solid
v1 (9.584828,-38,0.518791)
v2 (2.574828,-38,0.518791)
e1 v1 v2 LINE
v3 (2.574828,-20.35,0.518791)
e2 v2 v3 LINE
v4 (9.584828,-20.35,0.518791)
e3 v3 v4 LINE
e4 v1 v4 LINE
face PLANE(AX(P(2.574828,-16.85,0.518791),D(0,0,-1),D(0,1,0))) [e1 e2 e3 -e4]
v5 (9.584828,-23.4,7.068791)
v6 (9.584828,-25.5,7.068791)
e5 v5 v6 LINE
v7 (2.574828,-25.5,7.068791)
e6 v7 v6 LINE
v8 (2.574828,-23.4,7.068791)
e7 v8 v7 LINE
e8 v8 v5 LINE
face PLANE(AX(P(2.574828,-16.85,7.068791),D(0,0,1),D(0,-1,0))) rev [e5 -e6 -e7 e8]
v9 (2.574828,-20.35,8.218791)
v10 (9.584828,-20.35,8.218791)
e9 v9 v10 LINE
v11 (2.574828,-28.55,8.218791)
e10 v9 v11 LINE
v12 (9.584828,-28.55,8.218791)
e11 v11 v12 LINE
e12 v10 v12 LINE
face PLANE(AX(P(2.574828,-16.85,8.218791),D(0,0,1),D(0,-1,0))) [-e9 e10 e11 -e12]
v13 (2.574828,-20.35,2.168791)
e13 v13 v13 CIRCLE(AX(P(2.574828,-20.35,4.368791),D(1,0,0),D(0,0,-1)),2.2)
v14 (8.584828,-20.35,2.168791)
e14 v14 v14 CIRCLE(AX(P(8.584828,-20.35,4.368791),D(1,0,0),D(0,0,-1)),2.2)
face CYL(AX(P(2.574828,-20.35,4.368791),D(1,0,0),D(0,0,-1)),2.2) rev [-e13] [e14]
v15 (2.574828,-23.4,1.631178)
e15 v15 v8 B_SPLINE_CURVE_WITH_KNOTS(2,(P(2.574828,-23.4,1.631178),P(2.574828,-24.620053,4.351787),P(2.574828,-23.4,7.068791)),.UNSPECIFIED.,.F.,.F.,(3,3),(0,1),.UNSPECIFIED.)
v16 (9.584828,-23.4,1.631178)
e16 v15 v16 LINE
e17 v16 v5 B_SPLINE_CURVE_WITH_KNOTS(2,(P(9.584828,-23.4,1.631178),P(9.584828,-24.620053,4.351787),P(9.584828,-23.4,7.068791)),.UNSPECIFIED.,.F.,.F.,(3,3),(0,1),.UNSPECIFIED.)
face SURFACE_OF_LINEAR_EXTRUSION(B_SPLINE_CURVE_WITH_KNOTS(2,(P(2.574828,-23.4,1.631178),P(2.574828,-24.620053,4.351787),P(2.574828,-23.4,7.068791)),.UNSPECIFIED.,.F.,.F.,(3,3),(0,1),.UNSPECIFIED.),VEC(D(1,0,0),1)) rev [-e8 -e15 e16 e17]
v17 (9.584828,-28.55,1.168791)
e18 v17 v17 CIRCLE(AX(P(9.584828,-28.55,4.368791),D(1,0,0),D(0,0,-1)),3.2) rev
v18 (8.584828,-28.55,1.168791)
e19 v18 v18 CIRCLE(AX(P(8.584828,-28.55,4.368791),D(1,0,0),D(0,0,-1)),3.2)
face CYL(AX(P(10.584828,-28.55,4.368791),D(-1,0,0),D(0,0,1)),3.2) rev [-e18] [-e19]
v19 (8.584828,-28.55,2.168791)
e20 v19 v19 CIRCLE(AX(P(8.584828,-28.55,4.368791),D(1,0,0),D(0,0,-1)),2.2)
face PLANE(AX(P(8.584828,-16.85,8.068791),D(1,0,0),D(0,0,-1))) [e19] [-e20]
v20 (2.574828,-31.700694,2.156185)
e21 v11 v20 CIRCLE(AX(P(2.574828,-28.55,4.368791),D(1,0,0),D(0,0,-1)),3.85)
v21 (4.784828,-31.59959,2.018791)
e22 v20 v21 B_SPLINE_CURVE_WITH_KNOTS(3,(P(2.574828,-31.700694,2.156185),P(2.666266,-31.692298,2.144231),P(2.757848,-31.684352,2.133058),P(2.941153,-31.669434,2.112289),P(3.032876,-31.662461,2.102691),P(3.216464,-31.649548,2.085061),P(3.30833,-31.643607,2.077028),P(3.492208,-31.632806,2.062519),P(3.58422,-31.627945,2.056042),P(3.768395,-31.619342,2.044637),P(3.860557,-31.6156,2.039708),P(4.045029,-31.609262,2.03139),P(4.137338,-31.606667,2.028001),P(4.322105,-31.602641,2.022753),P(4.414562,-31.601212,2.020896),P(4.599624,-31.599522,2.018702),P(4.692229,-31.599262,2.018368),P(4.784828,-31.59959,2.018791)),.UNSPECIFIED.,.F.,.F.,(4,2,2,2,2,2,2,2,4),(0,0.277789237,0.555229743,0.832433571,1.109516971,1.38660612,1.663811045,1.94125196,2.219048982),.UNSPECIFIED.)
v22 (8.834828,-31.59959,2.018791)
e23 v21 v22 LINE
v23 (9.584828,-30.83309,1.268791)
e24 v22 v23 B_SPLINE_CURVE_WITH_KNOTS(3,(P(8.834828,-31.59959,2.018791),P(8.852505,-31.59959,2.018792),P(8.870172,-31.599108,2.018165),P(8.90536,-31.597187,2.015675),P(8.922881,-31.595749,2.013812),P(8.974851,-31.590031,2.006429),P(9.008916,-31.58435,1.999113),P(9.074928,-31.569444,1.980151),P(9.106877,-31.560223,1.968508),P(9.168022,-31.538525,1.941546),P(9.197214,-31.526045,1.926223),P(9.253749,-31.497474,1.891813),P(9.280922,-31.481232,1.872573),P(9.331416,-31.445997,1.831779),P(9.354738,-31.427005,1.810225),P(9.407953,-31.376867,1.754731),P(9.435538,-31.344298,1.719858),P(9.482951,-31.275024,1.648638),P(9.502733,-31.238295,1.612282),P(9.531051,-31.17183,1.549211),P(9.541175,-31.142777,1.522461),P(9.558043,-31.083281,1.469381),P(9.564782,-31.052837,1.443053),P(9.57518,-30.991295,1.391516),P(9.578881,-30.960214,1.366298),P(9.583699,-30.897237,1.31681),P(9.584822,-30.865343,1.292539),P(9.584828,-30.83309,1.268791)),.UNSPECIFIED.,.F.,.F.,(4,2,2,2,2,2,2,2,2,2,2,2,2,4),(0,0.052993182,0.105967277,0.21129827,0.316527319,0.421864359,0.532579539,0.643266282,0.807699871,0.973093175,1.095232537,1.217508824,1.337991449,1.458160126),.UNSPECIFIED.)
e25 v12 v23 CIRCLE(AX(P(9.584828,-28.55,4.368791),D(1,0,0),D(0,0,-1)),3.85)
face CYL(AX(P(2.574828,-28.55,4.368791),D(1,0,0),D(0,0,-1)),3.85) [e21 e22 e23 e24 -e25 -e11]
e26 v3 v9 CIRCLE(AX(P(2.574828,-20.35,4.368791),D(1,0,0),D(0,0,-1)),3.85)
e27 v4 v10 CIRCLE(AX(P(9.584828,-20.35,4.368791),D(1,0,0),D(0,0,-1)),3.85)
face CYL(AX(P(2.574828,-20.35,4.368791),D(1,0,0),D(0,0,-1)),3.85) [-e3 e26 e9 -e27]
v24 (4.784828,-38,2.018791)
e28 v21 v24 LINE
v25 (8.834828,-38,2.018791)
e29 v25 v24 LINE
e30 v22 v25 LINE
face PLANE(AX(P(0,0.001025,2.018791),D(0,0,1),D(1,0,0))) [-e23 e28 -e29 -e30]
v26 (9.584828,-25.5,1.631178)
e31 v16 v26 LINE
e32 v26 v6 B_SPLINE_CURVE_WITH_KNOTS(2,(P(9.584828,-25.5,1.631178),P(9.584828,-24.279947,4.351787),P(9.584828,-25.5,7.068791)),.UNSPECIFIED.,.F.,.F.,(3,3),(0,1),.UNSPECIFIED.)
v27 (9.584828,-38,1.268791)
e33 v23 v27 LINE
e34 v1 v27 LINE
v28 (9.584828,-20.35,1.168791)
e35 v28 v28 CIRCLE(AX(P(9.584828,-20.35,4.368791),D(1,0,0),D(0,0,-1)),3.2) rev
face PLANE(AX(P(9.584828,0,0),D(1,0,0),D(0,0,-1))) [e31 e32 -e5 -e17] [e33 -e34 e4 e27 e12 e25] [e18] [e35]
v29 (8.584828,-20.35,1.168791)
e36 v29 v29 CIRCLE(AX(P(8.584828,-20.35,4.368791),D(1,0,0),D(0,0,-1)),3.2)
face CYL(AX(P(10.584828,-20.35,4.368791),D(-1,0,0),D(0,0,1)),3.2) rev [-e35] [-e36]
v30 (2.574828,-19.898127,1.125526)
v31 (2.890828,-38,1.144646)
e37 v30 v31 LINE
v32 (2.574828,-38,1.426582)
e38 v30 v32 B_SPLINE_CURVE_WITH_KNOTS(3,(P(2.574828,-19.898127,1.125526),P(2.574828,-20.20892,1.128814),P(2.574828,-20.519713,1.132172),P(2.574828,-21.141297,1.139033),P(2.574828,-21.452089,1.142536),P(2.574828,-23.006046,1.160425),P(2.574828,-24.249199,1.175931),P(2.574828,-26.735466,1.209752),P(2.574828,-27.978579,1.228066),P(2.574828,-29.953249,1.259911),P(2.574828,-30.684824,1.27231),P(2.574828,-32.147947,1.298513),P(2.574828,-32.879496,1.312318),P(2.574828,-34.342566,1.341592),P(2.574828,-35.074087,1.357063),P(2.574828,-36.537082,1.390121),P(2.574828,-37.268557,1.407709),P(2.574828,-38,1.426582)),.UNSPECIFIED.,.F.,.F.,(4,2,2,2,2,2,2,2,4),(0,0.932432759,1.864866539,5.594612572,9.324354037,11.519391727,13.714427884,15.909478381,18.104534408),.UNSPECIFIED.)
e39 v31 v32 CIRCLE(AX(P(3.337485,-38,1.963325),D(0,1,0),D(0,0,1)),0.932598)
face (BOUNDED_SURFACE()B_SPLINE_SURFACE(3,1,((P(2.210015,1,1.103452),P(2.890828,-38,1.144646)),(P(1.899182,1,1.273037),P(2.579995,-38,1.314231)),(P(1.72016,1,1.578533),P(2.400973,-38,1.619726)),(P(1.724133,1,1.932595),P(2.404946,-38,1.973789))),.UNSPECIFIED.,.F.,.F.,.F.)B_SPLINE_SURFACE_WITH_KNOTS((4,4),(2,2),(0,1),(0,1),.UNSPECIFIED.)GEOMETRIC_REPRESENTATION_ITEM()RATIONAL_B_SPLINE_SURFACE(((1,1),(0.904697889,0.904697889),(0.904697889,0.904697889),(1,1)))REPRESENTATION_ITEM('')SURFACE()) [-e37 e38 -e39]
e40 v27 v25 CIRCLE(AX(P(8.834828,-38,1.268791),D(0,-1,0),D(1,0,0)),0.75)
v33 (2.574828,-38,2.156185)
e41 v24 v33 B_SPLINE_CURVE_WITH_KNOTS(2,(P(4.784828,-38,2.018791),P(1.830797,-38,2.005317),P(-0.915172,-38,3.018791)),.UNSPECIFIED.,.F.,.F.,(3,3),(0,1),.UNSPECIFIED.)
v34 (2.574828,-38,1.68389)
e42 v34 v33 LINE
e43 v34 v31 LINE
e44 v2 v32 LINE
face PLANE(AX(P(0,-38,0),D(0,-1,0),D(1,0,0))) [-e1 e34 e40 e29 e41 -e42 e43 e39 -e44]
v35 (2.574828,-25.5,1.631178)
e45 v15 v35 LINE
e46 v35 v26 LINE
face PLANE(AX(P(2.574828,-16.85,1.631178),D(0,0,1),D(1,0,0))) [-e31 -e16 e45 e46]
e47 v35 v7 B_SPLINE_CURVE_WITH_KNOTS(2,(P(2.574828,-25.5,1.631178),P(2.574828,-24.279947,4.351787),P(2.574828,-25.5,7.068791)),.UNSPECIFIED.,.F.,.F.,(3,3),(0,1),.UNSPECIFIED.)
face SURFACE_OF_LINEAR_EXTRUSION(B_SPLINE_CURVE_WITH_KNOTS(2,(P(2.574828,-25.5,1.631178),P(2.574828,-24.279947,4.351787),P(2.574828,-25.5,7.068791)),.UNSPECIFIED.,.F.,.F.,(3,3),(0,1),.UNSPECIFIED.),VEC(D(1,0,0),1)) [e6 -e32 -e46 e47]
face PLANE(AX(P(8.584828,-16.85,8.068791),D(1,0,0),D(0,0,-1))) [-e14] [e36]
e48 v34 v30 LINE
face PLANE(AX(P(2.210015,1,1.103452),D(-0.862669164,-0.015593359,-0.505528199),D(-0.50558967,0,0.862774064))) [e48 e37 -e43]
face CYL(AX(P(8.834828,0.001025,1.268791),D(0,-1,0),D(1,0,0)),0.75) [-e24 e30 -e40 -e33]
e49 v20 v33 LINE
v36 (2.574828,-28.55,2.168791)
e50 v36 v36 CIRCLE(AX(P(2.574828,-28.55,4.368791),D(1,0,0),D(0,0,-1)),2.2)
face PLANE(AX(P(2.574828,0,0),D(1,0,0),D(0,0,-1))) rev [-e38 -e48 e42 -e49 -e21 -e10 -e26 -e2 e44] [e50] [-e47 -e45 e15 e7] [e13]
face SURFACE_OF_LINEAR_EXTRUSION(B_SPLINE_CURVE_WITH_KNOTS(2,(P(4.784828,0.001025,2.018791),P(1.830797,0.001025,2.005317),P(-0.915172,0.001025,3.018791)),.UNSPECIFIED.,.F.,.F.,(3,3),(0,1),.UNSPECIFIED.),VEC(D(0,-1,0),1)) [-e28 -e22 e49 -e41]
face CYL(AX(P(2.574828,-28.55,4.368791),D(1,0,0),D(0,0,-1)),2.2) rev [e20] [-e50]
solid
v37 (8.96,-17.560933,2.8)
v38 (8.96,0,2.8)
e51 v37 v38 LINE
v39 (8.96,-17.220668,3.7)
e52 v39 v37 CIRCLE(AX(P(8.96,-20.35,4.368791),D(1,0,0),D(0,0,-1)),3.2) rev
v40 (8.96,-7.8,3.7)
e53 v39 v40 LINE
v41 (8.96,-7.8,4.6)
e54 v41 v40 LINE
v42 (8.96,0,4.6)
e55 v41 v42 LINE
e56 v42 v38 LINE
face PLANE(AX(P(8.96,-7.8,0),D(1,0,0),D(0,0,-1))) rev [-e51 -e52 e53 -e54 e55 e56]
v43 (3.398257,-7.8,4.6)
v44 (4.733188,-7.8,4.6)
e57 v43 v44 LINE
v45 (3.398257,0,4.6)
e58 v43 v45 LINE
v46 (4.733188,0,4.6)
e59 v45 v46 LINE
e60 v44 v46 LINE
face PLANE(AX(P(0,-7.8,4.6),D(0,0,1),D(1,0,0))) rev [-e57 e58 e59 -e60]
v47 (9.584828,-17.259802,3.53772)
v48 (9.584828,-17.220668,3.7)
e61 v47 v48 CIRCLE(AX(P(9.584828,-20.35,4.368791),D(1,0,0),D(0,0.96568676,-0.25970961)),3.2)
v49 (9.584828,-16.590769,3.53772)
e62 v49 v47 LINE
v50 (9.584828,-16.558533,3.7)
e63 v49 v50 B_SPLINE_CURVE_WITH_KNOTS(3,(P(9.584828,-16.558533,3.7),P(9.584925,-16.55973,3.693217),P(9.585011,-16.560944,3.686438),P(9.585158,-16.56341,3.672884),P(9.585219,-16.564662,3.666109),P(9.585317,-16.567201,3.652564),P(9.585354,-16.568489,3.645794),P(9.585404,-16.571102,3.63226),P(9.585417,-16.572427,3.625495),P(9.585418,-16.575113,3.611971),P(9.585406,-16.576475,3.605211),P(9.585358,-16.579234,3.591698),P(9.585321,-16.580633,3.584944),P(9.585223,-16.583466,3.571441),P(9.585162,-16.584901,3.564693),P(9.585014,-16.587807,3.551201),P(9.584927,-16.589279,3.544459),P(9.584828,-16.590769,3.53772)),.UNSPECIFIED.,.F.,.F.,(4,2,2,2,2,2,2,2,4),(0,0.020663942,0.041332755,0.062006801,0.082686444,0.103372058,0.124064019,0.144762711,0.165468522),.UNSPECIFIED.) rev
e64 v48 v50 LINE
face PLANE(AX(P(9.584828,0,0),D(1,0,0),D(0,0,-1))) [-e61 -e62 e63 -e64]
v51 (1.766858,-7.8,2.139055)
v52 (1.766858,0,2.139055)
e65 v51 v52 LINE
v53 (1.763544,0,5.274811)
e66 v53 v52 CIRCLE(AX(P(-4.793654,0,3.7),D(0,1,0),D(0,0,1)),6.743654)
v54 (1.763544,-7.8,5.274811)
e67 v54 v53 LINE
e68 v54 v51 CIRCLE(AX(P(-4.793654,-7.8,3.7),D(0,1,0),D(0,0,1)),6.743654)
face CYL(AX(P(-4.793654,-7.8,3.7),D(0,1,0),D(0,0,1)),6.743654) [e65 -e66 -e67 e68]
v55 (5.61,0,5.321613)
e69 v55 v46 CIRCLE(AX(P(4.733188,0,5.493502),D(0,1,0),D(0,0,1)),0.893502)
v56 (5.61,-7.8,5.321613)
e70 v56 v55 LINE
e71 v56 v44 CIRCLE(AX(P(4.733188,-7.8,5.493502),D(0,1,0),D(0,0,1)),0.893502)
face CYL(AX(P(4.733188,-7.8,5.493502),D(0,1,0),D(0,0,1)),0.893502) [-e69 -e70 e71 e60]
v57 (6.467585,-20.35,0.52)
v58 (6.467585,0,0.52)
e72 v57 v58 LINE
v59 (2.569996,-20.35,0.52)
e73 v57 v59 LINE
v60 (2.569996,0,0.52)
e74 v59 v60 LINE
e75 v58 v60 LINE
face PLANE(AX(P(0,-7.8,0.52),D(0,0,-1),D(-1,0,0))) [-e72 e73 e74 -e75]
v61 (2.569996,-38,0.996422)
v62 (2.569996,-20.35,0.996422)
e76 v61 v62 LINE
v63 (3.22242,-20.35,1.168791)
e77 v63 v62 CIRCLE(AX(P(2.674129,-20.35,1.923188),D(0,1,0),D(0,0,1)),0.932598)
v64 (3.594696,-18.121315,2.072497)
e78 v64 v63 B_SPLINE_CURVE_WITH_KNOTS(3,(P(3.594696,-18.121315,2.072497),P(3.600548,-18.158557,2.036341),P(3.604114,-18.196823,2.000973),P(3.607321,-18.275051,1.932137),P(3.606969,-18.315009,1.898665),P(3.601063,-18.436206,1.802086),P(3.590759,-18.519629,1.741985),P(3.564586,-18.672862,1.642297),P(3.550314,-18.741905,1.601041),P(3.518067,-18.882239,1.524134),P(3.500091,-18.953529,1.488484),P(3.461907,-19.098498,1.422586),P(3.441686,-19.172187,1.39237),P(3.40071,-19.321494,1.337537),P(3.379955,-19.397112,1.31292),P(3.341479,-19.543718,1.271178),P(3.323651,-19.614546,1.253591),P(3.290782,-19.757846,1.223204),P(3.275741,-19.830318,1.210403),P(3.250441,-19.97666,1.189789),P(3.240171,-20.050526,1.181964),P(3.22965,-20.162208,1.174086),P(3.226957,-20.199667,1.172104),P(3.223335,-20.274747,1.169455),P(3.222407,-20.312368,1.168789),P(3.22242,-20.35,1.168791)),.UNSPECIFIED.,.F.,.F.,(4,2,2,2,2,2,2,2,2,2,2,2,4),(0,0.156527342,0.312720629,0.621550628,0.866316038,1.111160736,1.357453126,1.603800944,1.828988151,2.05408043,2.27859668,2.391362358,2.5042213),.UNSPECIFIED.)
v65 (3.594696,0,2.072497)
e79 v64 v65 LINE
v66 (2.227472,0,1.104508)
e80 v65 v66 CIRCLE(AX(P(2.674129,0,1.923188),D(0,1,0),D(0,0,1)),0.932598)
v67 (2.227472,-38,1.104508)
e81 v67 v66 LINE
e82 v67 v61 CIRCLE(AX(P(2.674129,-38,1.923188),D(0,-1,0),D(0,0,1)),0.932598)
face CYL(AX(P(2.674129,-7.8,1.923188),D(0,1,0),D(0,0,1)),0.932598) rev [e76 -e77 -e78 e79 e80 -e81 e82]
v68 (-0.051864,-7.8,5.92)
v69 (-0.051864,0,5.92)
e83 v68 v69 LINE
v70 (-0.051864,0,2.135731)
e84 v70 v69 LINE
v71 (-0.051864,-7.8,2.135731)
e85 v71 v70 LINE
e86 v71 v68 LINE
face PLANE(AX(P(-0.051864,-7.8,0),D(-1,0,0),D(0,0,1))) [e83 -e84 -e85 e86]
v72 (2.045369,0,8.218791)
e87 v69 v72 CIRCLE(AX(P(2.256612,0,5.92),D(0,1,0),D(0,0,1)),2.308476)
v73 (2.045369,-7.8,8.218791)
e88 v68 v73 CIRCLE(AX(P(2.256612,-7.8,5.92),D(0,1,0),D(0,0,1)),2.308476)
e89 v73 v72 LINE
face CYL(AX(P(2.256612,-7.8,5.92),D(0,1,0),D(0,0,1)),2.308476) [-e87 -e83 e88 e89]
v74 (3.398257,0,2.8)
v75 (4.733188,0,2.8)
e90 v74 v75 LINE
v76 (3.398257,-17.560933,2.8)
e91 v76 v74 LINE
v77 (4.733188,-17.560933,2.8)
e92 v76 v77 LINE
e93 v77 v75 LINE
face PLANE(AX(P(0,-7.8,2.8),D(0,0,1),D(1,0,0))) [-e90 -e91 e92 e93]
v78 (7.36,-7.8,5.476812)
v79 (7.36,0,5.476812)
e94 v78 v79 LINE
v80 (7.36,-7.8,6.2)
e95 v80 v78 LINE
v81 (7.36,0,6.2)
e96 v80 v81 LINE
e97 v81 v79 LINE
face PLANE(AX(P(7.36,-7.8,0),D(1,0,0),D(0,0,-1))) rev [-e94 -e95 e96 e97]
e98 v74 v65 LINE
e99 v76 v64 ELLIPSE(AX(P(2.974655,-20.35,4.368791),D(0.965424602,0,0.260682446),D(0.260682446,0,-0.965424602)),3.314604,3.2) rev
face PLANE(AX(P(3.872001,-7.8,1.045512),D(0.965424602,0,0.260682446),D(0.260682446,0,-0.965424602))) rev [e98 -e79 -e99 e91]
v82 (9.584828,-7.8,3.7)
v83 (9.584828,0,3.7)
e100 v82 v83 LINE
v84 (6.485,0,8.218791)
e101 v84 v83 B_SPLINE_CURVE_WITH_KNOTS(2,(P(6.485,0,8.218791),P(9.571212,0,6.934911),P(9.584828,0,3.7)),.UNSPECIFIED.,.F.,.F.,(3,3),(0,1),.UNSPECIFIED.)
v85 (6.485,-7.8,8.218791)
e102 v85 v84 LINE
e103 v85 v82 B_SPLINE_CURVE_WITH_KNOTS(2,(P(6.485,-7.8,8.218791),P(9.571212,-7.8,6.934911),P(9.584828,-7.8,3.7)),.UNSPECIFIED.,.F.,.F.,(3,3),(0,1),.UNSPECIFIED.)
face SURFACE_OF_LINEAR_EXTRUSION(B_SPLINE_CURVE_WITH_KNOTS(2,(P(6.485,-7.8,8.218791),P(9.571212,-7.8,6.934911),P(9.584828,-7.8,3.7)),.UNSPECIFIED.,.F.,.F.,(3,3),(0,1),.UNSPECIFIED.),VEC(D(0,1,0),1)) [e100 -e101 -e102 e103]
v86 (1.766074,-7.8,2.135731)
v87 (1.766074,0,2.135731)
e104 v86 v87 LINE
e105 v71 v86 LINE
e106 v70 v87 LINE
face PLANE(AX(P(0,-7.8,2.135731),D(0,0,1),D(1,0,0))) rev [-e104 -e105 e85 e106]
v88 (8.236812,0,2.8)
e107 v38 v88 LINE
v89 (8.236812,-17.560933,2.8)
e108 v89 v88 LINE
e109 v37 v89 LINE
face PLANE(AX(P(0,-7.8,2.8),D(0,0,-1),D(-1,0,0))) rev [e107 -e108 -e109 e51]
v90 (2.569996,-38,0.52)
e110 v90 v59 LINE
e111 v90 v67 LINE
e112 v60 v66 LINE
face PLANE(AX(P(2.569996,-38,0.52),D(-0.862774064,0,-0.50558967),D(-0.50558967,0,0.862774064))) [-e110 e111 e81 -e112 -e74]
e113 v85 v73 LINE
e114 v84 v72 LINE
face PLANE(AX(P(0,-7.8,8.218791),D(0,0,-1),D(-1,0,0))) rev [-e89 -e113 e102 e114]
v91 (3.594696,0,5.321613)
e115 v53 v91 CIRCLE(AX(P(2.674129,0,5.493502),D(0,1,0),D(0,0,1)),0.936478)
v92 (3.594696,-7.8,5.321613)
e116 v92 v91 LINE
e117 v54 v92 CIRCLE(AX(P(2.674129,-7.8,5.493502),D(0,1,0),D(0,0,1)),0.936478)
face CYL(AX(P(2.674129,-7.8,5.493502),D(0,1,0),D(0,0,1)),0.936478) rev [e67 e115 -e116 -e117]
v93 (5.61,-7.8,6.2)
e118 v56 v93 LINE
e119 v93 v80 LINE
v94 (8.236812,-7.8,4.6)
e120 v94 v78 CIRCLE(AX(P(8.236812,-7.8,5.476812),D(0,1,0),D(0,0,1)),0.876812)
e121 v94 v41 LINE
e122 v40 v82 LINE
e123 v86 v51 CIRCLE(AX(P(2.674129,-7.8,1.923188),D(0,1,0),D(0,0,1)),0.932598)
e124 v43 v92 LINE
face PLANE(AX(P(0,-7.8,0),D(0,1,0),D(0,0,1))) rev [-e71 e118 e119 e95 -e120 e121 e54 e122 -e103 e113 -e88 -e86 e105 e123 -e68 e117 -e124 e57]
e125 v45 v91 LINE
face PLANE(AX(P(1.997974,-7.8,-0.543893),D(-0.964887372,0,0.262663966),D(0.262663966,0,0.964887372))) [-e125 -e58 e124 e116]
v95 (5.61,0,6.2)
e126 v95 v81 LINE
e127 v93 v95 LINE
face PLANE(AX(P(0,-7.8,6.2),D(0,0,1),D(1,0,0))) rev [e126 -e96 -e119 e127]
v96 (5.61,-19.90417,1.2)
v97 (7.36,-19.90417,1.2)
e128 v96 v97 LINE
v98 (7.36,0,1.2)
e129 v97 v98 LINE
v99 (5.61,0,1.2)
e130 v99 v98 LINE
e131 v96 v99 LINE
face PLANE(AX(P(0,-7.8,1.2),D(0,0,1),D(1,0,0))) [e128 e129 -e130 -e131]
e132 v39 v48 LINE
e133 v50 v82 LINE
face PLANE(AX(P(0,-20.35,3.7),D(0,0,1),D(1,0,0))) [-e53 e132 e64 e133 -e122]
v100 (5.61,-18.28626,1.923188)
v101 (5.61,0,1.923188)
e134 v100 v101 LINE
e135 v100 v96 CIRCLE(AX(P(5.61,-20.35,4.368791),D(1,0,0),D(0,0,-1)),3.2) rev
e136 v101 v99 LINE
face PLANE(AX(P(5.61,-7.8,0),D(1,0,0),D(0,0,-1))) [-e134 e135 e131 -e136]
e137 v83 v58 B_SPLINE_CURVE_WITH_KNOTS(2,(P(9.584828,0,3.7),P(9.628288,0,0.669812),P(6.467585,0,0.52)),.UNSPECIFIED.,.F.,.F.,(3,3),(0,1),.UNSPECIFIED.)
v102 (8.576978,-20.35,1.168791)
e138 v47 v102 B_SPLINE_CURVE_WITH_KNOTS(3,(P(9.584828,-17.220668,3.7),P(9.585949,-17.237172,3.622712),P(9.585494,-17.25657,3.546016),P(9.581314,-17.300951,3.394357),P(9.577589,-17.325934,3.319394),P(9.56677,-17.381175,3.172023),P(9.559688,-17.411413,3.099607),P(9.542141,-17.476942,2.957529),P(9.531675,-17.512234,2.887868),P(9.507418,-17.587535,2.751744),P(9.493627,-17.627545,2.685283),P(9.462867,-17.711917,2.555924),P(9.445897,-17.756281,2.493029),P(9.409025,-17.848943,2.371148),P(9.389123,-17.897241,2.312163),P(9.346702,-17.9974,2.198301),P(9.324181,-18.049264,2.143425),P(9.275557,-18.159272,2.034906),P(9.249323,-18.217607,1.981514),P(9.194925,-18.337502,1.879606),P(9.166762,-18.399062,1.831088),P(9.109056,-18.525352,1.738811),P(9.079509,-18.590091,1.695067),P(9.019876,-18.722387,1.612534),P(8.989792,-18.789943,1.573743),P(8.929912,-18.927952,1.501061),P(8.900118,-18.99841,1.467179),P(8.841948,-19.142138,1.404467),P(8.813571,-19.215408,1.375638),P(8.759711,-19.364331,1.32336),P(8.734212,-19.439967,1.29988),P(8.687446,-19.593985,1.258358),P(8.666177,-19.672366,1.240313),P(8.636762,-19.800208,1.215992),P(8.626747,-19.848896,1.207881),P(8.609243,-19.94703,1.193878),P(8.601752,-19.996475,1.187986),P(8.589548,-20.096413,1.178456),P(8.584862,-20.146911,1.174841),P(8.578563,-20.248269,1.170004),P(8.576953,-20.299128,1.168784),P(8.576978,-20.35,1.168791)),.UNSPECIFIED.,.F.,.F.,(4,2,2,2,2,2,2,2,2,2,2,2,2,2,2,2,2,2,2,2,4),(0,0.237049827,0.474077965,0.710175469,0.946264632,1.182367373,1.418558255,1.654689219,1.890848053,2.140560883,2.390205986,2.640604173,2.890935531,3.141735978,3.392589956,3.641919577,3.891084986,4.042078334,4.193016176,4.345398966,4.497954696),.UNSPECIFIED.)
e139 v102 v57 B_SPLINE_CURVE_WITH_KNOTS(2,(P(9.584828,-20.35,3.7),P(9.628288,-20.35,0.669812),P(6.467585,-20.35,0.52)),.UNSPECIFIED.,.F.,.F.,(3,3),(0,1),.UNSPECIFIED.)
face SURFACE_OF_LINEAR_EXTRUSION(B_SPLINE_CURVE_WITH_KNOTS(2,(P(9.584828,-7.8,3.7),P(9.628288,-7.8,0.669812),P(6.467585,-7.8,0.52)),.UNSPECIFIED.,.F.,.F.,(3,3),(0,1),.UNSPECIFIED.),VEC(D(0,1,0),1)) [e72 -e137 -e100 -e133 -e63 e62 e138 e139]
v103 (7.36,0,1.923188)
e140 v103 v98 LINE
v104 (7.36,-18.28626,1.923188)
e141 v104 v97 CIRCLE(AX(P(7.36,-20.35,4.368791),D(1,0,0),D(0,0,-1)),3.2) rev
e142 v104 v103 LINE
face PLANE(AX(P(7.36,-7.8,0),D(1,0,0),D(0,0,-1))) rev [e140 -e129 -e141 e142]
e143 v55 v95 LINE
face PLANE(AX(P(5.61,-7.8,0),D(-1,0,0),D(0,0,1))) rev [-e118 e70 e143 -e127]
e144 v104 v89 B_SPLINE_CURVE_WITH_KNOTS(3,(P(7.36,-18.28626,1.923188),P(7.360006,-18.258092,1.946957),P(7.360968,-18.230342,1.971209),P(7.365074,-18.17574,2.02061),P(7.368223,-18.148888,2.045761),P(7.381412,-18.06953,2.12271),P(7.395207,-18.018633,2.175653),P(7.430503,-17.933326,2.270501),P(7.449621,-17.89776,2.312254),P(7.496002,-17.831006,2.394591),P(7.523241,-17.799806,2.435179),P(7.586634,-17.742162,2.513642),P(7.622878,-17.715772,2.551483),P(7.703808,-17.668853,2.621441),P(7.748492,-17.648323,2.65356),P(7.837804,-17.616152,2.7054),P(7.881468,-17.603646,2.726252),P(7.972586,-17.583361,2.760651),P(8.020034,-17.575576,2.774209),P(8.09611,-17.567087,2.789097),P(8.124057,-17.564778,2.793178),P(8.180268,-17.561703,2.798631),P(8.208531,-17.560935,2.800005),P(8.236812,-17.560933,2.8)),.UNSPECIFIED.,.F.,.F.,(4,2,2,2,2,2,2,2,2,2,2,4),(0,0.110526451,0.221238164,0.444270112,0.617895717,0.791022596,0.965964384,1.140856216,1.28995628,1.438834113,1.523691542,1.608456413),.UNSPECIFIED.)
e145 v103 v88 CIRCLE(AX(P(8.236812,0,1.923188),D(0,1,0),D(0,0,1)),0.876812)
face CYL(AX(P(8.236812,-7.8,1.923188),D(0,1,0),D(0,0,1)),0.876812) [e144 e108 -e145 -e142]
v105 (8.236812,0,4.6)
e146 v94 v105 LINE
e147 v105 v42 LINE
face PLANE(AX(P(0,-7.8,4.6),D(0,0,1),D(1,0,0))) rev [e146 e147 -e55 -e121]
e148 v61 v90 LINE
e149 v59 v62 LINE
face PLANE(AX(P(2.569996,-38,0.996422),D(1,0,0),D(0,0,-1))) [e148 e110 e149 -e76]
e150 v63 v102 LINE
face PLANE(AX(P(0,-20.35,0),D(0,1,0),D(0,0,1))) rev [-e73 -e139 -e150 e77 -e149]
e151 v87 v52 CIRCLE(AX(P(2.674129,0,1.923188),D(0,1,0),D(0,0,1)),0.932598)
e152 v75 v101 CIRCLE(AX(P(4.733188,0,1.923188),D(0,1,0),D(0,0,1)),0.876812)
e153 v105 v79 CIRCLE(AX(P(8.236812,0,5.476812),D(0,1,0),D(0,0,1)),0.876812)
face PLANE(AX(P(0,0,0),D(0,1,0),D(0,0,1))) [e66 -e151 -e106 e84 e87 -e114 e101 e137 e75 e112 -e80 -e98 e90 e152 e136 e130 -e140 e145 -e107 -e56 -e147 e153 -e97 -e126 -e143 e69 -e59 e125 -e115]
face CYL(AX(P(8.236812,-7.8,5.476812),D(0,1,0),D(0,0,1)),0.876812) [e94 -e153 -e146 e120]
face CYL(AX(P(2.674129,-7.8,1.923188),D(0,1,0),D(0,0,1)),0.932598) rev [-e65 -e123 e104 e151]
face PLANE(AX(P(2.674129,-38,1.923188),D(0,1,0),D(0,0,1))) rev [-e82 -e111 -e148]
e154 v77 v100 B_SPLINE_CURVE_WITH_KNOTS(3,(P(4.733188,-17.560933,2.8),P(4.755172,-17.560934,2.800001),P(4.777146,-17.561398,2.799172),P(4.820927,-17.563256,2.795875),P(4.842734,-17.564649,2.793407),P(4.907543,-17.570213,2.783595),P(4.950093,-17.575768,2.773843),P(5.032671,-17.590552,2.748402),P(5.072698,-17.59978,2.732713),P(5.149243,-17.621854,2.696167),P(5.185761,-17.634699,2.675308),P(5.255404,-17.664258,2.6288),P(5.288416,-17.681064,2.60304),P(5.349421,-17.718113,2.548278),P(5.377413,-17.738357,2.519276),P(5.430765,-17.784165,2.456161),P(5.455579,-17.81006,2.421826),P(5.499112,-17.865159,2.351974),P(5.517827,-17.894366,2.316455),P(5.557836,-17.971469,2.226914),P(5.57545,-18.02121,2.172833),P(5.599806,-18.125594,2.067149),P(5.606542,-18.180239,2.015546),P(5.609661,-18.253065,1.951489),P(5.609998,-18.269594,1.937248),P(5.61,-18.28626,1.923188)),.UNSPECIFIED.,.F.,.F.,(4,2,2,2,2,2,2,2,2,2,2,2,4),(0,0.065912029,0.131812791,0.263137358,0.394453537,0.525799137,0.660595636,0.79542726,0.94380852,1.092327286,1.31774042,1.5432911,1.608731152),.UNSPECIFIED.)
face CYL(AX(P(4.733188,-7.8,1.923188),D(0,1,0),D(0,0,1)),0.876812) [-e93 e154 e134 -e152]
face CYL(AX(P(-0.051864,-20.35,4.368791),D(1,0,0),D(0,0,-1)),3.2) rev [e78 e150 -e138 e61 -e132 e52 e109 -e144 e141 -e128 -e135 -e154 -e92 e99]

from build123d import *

# Parameters (mm, degrees)
SKETCH4_R                 = 3.2
BOSS_EXTRUDE1_DEPTH       = 7.01
SKETCH4_3_R               = 3.2
SKETCH4_3_R_2             = 2.2
BOSS_EXTRUDE2_DEPTH       = 7.01
SKETCH4_4_R               = 3.2
SKETCH4_4_R_2             = 2.2
BOSS_EXTRUDE3_DEPTH       = 7.01
CUT_EXTRUDE6_DEPTH        = 1
CUT_EXTRUDE6_DEPTH_BACK   = 1
SKETCH4_10_R              = 3.2
SKETCH4_10_R_2            = 2.2
CUT_EXTRUDE7_DEPTH        = 1
CUT_EXTRUDE7_DEPTH_BACK   = 1
SKETCH4_11_R              = 3.2
SKETCH4_11_R_2            = 2.2
BOSS_EXTRUDE7_DEPTH       = 7.8
BOSS_EXTRUDE10_DEPTH      = 20.35
CUT_EXTRUDE8_DEPTH        = 35.787560655
CUT_EXTRUDE8_DEPTH_BACK   = 35.787560655
SKETCH12_R                = 3.2
SKETCH12_R_2              = 2.2
CUT_EXTRUDE10_START       = 4
SKETCH12_4_R              = 3.2
CUT_EXTRUDE10_DEPTH       = 4
BOSS_EXTRUDE14_REACH      = 42.043
BOSS_EXTRUDE14_END_RADIUS = 3.85
BOSS_EXTRUDE15_DEPTH      = 38


with BuildPart() as part:
    # Sketch4 → Boss-Extrude1 (new body)
    with BuildSketch(Plane(origin=(9.58482821, 0, 0), x_dir=(0, 0, -1), z_dir=(1, 0, 0))):
        with BuildLine():
            ThreePointArc((-0.15, -11.7), (3.7, -15.55), (7.55, -11.7))
            Line((7.55, -11.7), (7.55, -3.5))
            ThreePointArc((7.55, -3.5), (3.7, 0.35), (-0.15, -3.5))
            Line((-0.15, -3.5), (-0.15, -11.7))
        make_face()
        with Locations((3.7, -11.7)):
            Circle(SKETCH4_R, mode=Mode.SUBTRACT)
        with BuildLine():
            Line((6.437612841, -6.55), (6.437612841, -7.6))
            Line((6.437612841, -7.6), (6.437612841, -8.125))
            Line((6.437612841, -8.125), (6.437612841, -8.65))
            add(Edge.make_bspline(
                [(6.437612841, -8.65), (3.717003621, -7.429947086), (1, -8.65)],
                knots=[0, 0, 0, 1, 1, 1], degree=2))
            Line((1, -8.65), (1, -7.6))
            Line((1, -7.6), (1, -6.55))
            add(Edge.make_bspline(
                [(6.437612841, -6.55), (3.717003621, -7.770052914), (1, -6.55)],
                knots=[0, 0, 0, 1, 1, 1], degree=2))
        make_face(mode=Mode.SUBTRACT)
        with Locations((3.7, -3.5)):
            Circle(SKETCH4_R, mode=Mode.SUBTRACT)
    extrude(amount=-BOSS_EXTRUDE1_DEPTH)

    # Sketch4<3> → Boss-Extrude2 (add)
    with BuildSketch(Plane(origin=(9.58482821, 0, 0), x_dir=(0, 0, -1), z_dir=(1, 0, 0))):
        with Locations((3.7, -3.5)):
            Circle(SKETCH4_3_R)
        with Locations((3.7, -3.5)):
            Circle(SKETCH4_3_R_2, mode=Mode.SUBTRACT)
    extrude(amount=-BOSS_EXTRUDE2_DEPTH)

    # Sketch4<4> → Boss-Extrude3 (add)
    with BuildSketch(Plane(origin=(9.58482821, 0, 0), x_dir=(0, 0, -1), z_dir=(1, 0, 0))):
        with Locations((3.7, -11.7)):
            Circle(SKETCH4_4_R)
        with Locations((3.7, -11.7)):
            Circle(SKETCH4_4_R_2, mode=Mode.SUBTRACT)
    extrude(amount=-BOSS_EXTRUDE3_DEPTH)

    # Sketch4<10> → Cut-Extrude6 (cut, two sides: drawn at the far end of the back side and taken through both)
    with BuildSketch(Plane(origin=(9.58482821, 0, 0), x_dir=(0, 0, -1), z_dir=(1, 0, 0)).offset(-CUT_EXTRUDE6_DEPTH_BACK)):
        with Locations((3.7, -11.7)):
            Circle(SKETCH4_10_R)
        with Locations((3.7, -11.7)):
            Circle(SKETCH4_10_R_2, mode=Mode.SUBTRACT)
    extrude(amount=CUT_EXTRUDE6_DEPTH + CUT_EXTRUDE6_DEPTH_BACK, mode=Mode.SUBTRACT)

    # Sketch4<11> → Cut-Extrude7 (cut, two sides: drawn at the far end of the back side and taken through both)
    with BuildSketch(Plane(origin=(9.58482821, 0, 0), x_dir=(0, 0, -1), z_dir=(1, 0, 0)).offset(-CUT_EXTRUDE7_DEPTH_BACK)):
        with Locations((3.7, -3.5)):
            Circle(SKETCH4_11_R)
        with Locations((3.7, -3.5)):
            Circle(SKETCH4_11_R_2, mode=Mode.SUBTRACT)
    extrude(amount=CUT_EXTRUDE7_DEPTH + CUT_EXTRUDE7_DEPTH_BACK, mode=Mode.SUBTRACT)


with BuildPart() as body_2:
    # Sketch1 → Boss-Extrude7 (new body)
    with BuildSketch(Plane(origin=(0, 0, 0), x_dir=(1, 0, 0), z_dir=(0, 1, 0))):
        with BuildLine():
            Line((3.59469637, -2.072497286), (3.398257221, -2.8))
            Line((3.398257221, -2.8), (4.733187591, -2.8))
            ThreePointArc((4.733187591, -2.8), (5.272835448, -2.614259361), (5.583849365, -2.13573064))
            ThreePointArc((5.583849365, -2.13573064), (5.603437785, -2.030260467), (5.61, -1.923187591))
            Line((5.61, -1.923187591), (5.61, -1.2))
            Line((5.61, -1.2), (7.36, -1.2))
            Line((7.36, -1.2), (7.36, -1.923187591))
            ThreePointArc((7.36, -1.923187591), (7.616812409, -2.543187591), (8.236812409, -2.8))
            Line((8.236812409, -2.8), (8.96, -2.8))
            Line((8.96, -2.8), (8.96, -4.6))
            Line((8.96, -4.6), (8.236812409, -4.6))
            ThreePointArc((8.236812409, -4.6), (7.616812409, -4.856812409), (7.36, -5.476812409))
            Line((7.36, -5.476812409), (7.36, -6.2))
            Line((7.36, -6.2), (5.61, -6.2))
            Line((5.61, -6.2), (5.61, -5.321612701))
            ThreePointArc((5.61, -5.321612701), (5.300973839, -4.8036001), (4.733187591, -4.6))
            Line((4.733187591, -4.6), (3.398257221, -4.6))
            Line((3.398257221, -4.6), (3.59469637, -5.321612701))
            ThreePointArc((3.59469637, -5.321612701), (2.650201437, -6.429674305), (1.763543504, -5.27481115))
            ThreePointArc((1.763543504, -5.27481115), (1.949996233, -3.707128316), (1.766858128, -2.139054809))
            ThreePointArc((1.766858128, -2.139054809), (1.76646436, -2.137393083), (1.766073636, -2.13573064))
            Line((1.766073636, -2.13573064), (-0.051864294, -2.13573064))
            Line((-0.051864294, -2.13573064), (-0.051864294, -5.92))
            ThreePointArc((-0.051864294, -5.92), (0.551221604, -7.47586198), (2.045368773, -8.21879087))
            Line((2.045368773, -8.21879087), (6.485, -8.21879087))
            add(Edge.make_bspline(
                [(6.485, -8.21879087), (9.5712117, -6.934911374), (9.58482821, -3.7)],
                knots=[0, 0, 0, 1, 1, 1], degree=2))
            add(Edge.make_bspline(
                [(9.58482821, -3.7), (9.628287772, -0.669812126), (6.467585098, -0.52)],
                knots=[0, 0, 0, 1, 1, 1], degree=2))
            Line((6.467585098, -0.52), (2.569996233, -0.52))
            Line((2.569996233, -0.52), (2.569996233, -0.9964218))
            ThreePointArc((2.569996233, -0.9964218), (3.349499839, -1.280060786), (3.59469637, -2.072497286))
        make_face()
    extrude(amount=-BOSS_EXTRUDE7_DEPTH)

    # Sketch1<9> → Boss-Extrude10 (add)
    with BuildSketch(Plane(origin=(0, 0, 0), x_dir=(1, 0, 0), z_dir=(0, 1, 0))):
        with BuildLine():
            Line((3.59469637, -2.072497286), (3.398257221, -2.8))
            Line((3.398257221, -2.8), (4.733187591, -2.8))
            ThreePointArc((4.733187591, -2.8), (5.272835448, -2.614259361), (5.583849365, -2.13573064))
            ThreePointArc((5.583849365, -2.13573064), (5.603437785, -2.030260467), (5.61, -1.923187591))
            Line((5.61, -1.923187591), (5.61, -1.2))
            Line((5.61, -1.2), (7.36, -1.2))
            Line((7.36, -1.2), (7.36, -1.923187591))
            ThreePointArc((7.36, -1.923187591), (7.616812409, -2.543187591), (8.236812409, -2.8))
            Line((8.236812409, -2.8), (8.96, -2.8))
            Line((8.96, -2.8), (8.96, -3.7))
            Line((8.96, -3.7), (9.58482821, -3.7))
            add(Edge.make_bspline(
                [(9.58482821, -3.7), (9.628287772, -0.669812126), (6.467585098, -0.52)],
                knots=[0, 0, 0, 1, 1, 1], degree=2))
            Line((6.467585098, -0.52), (2.569996233, -0.52))
            Line((2.569996233, -0.52), (2.569996233, -0.9964218))
            ThreePointArc((2.569996233, -0.9964218), (3.349499839, -1.280060786), (3.59469637, -2.072497286))
        make_face()
    extrude(amount=-BOSS_EXTRUDE10_DEPTH)

    # Sketch12 → Cut-Extrude8 (cut, two sides: drawn at the far end of the back side and taken through both)
    # profile 1 of 2: a face of its own
    with BuildSketch(Plane(origin=(9.58482821, 0, 0), x_dir=(0, 0, -1), z_dir=(1, 0, 0)).offset(-CUT_EXTRUDE8_DEPTH_BACK)):
        with Locations((-4.368790873, -20.349999996)):
            Circle(SKETCH12_R)
        with Locations((-4.368790873, -20.349999996)):
            Circle(SKETCH12_R_2, mode=Mode.SUBTRACT)
    # profile 2 of 2: a face of its own
    with BuildSketch(Plane(origin=(9.58482821, 0, 0), x_dir=(0, 0, -1), z_dir=(1, 0, 0)).offset(-CUT_EXTRUDE8_DEPTH_BACK)):
        with Locations((-4.368790873, -20.349999996)):
            Circle(SKETCH12_R)
    extrude(amount=CUT_EXTRUDE8_DEPTH + CUT_EXTRUDE8_DEPTH_BACK, mode=Mode.SUBTRACT)

    # Sketch12<4> → Cut-Extrude10 (cut)
    with BuildSketch(Plane(origin=(9.58482821, 0, 0), x_dir=(0, 0, -1), z_dir=(1, 0, 0)).offset(CUT_EXTRUDE10_START)):
        with BuildLine():
            ThreePointArc((-2.54662978, -23.741493613), (-1.064413458, -22.325750461), (-0.518790873, -20.349999996))
            ThreePointArc((-0.518790873, -20.349999996), (-4.368790873, -16.499999996), (-8.218790873, -20.349999996))
            ThreePointArc((-8.218790873, -20.349999996), (-7.686598281, -22.303113922), (-6.237152428, -23.716262776))
            add(Edge.make_bspline(
                [(-6.237152428, -23.716262776), (-4.392721558, -24.290891537), (-2.54662978, -23.741493613)],
                knots=[0.15302777, 0.15302777, 0.15302777, 0.831737351, 0.831737351, 0.831737351], degree=2))
        make_face()
        with Locations((-4.368790873, -20.349999996)):
            Circle(SKETCH12_4_R, mode=Mode.SUBTRACT)
    extrude(amount=-CUT_EXTRUDE10_DEPTH, mode=Mode.SUBTRACT)

    # Sketch20 → Boss-Extrude15 (add)
    with BuildSketch(Plane(origin=(0, 0, 0), x_dir=(1, 0, 0), z_dir=(0, 1, 0))):
        with BuildLine():
            Line((2.569996233, -0.9964218), (2.569996233, -0.52))
            Line((2.569996233, -0.52), (2.227471679, -1.104508185))
            ThreePointArc((2.227471679, -1.104508185), (2.393481354, -1.033819556), (2.569996233, -0.9964218))
        make_face()
    extrude(amount=-BOSS_EXTRUDE15_DEPTH)


with BuildPart() as part_1:
    # Move Face5: read off the stored shape, not the designer's step
    # Move Face5: moved
    add(part.part.moved(Location((0, -16.85, 8.0687909))))

    # Boss-Extrude14: up to this cylinder (the profile starts outside it)
    boss_extrude14_end = Plane(origin=(6.013975, -28.549999996, 4.368790873), z_dir=(1, 0, 0)) * Cylinder(BOSS_EXTRUDE14_END_RADIUS, 92.786, mode=Mode.PRIVATE)
    # Sketch2<17> → Boss-Extrude14 (add, up to the surface)
    with BuildSketch(Plane(origin=(0, -38, 0), x_dir=(-1, 0, 0), z_dir=(0, -1, 0)), mode=Mode.PRIVATE) as boss_extrude14_sk1:
        with BuildLine():
            Line((-2.57482821, -2.156184836), (-2.57482821, -0.518790873))
            Line((-2.57482821, -0.518790873), (-8.83482821, -0.518790873))
            Line((-8.83482821, -0.518790873), (-9.58482821, -0.518790873))
            Line((-9.58482821, -0.518790873), (-9.58482821, -1.268790873))
            ThreePointArc((-9.58482821, -1.268790873), (-9.365158296, -1.799120959), (-8.83482821, -2.018790873))
            Line((-8.83482821, -2.018790873), (-4.78482821, -2.018790873))
            add(Edge.make_bspline(
                [(-4.78482821, -2.018790873), (-4.707310794, -2.018437294), (-4.62993665, -2.018790873)],
                knots=[0, 0, 0, 0.026241233, 0.026241233, 0.026241233], degree=2))
            add(Edge.make_bspline(
                [(-4.62993665, -2.018790873), (-3.589427607, -2.023545726), (-2.57482821, -2.156184836)],
                knots=[0.026241233, 0.026241233, 0.026241233, 0.379127073, 0.379127073, 0.379127073], degree=2))
        make_face()
    boss_extrude14_tool1 = extrude(boss_extrude14_sk1.sketch, amount=-BOSS_EXTRUDE14_REACH, mode=Mode.PRIVATE) - boss_extrude14_end
    add(boss_extrude14_tool1.solids().sort_by_distance((6.013975, -38, 1.269386))[0])

    # Cut-Sweep1: sweep along a curve in space
    with BuildLine() as cut_sweep1_path:
        Line((1.766073636, 0, 2.13573064), (2.429429954, -38, 2.17586803))
    # Sketch21 → Cut-Sweep1 (sweep, cut)
    with BuildSketch(Plane(origin=(0, 0, 0), x_dir=(1, 0, 0), z_dir=(0, 1, 0))):
        with BuildLine():
            Line((2.227471679, -1.104508185), (1.741589664, -1.933651709))
            ThreePointArc((1.741589664, -1.933651709), (1.869507543, -1.451675851), (2.227471679, -1.104508185))
        make_face()
    sweep(path=cut_sweep1_path.line, mode=Mode.SUBTRACT)


solid = Compound([body_2.part, part_1.part])
